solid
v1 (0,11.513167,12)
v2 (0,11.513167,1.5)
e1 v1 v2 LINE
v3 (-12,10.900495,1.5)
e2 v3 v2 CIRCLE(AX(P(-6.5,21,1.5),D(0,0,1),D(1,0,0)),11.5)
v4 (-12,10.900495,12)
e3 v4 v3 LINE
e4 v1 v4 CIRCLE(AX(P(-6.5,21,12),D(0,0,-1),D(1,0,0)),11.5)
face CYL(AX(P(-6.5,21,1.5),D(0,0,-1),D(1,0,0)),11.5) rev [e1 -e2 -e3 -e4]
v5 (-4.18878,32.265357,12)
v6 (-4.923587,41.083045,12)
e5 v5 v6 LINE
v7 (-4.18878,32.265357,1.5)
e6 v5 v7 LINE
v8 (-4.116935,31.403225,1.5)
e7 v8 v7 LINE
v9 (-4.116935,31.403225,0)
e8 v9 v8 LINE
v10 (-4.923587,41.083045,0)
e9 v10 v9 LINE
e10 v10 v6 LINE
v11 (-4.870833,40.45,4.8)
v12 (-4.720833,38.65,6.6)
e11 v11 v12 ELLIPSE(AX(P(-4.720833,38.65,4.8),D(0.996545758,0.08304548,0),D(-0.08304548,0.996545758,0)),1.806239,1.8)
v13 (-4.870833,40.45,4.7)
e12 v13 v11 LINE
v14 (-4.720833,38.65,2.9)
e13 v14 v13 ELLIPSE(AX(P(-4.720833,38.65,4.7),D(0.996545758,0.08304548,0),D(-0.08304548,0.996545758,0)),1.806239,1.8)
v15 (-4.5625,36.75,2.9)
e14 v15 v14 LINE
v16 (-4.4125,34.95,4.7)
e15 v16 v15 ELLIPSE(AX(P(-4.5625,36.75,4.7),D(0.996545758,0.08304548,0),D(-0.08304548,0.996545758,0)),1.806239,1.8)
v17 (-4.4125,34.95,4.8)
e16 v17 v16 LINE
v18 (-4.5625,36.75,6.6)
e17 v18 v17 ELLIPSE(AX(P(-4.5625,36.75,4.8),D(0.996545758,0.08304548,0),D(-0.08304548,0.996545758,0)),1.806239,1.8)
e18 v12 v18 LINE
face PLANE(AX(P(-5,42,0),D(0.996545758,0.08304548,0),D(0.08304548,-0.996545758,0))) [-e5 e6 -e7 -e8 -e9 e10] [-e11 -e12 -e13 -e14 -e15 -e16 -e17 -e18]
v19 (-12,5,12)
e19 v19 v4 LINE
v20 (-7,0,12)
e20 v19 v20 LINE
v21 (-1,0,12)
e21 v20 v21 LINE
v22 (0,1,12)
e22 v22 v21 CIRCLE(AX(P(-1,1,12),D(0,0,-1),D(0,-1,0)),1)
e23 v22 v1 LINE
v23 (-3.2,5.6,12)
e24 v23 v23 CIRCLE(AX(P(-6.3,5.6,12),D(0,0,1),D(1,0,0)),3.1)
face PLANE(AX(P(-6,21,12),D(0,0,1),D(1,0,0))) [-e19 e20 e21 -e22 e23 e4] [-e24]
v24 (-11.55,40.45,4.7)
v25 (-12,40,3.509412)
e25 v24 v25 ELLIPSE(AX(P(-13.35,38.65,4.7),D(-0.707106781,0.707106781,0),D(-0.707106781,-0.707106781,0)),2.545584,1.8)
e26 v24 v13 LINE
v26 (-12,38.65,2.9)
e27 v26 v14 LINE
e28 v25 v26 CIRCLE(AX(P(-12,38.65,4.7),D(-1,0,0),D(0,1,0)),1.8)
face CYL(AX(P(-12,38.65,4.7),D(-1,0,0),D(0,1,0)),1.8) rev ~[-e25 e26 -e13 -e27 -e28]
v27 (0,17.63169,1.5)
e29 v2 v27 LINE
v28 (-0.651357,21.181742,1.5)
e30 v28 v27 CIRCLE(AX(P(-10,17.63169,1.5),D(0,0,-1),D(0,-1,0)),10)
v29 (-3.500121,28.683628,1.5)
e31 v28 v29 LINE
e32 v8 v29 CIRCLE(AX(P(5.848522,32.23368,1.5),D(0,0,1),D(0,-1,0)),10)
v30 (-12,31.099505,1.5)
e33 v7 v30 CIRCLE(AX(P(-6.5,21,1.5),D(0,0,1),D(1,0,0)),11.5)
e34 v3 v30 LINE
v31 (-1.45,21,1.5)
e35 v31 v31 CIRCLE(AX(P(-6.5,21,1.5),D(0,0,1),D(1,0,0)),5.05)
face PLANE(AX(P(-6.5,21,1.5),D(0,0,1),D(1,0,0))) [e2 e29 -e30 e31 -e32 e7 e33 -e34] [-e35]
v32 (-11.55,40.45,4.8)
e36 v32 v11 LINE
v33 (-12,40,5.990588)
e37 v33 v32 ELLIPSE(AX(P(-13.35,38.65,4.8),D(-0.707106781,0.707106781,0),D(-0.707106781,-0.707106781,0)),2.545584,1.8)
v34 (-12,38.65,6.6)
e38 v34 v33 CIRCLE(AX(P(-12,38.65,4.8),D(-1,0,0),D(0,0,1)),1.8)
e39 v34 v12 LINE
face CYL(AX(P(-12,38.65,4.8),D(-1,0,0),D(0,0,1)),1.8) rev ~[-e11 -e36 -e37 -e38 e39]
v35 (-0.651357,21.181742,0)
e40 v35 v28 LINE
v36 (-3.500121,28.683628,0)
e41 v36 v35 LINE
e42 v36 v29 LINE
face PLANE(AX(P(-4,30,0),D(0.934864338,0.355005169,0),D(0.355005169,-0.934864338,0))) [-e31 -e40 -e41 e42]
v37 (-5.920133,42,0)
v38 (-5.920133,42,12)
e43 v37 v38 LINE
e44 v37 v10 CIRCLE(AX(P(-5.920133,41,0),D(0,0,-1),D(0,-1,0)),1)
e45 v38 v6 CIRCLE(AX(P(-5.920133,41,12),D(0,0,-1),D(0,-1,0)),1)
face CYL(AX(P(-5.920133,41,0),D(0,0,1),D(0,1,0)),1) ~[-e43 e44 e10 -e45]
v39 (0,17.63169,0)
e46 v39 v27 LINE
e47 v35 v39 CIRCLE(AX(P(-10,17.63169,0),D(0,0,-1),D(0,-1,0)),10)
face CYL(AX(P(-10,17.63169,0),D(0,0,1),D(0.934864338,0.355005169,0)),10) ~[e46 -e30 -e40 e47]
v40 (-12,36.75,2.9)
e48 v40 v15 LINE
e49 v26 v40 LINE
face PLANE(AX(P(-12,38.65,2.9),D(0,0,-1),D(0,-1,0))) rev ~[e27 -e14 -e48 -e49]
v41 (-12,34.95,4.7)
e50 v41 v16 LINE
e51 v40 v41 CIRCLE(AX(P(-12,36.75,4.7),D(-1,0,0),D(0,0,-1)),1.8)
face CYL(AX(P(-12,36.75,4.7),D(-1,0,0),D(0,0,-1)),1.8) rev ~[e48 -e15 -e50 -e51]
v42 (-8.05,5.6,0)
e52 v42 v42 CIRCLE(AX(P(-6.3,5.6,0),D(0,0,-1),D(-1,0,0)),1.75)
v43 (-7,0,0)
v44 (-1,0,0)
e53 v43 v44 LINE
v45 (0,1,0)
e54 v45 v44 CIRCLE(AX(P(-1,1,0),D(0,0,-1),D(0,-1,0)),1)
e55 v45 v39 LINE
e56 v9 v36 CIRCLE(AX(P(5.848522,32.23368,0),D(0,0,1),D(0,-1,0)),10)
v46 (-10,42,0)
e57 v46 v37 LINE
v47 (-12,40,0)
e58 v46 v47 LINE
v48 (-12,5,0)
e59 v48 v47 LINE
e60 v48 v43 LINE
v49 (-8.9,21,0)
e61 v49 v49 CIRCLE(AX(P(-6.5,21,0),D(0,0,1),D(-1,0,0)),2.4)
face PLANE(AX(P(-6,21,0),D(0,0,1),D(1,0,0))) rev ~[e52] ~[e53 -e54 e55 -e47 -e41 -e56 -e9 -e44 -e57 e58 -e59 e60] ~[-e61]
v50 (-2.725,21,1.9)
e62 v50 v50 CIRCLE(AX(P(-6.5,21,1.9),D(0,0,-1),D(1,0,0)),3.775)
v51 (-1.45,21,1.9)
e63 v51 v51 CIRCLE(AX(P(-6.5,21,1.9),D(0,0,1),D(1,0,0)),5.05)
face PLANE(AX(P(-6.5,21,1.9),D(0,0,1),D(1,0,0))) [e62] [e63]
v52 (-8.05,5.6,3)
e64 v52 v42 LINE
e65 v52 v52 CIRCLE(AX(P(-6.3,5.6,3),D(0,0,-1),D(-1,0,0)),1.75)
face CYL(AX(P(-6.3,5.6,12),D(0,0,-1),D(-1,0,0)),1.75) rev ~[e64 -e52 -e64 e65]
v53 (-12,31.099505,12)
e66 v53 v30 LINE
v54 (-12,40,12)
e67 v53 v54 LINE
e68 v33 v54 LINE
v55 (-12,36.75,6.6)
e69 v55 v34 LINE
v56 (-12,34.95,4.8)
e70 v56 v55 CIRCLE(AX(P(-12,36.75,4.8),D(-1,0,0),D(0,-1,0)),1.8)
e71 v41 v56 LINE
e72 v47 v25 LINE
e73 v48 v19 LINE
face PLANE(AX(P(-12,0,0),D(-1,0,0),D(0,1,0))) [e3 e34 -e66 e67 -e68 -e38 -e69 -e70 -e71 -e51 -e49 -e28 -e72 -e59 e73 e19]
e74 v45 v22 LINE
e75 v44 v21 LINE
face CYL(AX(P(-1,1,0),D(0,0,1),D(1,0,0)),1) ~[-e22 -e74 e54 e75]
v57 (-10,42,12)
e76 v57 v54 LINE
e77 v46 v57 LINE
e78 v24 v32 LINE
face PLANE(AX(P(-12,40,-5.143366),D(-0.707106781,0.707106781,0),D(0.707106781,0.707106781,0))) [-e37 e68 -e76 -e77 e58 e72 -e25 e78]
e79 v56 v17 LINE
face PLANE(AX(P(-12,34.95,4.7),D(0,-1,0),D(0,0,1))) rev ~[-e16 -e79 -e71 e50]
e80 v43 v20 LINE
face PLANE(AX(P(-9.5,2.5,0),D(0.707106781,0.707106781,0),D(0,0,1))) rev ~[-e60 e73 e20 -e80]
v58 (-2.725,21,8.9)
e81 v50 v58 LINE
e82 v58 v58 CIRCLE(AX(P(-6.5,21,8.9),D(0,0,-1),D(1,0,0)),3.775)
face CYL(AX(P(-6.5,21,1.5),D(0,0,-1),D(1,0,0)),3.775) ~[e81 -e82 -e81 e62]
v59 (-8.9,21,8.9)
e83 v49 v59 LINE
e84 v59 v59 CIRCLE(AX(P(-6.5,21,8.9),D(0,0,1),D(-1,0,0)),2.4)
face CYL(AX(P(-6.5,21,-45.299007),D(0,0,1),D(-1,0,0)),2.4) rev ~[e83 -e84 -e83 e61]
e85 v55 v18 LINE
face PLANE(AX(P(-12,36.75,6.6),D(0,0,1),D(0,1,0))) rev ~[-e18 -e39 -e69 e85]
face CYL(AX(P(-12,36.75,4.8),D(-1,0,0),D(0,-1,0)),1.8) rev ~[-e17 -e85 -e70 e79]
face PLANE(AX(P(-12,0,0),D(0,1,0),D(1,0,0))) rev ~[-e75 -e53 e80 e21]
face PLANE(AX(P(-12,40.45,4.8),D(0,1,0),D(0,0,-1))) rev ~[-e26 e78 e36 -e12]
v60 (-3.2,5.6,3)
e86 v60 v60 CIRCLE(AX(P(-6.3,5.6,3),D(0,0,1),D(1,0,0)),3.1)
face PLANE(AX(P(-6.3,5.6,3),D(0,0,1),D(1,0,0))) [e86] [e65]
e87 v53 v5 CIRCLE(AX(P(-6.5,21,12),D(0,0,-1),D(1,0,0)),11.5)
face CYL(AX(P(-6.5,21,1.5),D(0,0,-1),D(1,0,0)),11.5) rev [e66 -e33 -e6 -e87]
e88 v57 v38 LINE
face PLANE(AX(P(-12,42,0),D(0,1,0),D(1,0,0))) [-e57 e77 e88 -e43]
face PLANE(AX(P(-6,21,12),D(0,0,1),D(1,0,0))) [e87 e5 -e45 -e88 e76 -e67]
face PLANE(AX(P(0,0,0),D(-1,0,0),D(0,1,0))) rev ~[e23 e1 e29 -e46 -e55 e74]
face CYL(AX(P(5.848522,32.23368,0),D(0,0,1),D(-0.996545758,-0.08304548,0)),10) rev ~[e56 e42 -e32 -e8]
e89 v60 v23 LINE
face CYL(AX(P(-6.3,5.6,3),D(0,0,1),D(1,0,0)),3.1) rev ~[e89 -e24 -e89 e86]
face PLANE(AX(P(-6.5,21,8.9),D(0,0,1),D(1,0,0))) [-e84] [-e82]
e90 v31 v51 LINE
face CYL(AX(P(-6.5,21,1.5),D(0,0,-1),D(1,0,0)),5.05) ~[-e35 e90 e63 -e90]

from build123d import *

# Parameters (mm, degrees)
F1_W            = 12
F1_H            = 42
F2_DEPTH        = 12
F7_R            = 11.5
F7_R_2          = 3.775
F9_DEPTH        = 25
F8_R            = 5.05
F10_DEPTH       = 0.4
F11_D           = 4.8
F12_D           = 3.5
F12_CBORE_D     = 6.2
F12_CBORE_DEPTH = 9
F14_DEPTH       = 25
F16_DEPTH       = 25
F17_SIZE        = 5
F18_T1_DEPTH    = 22.2867319519
F19_R           = 1
F20_R           = 4.5
F21_DEPTH       = 3.1
F22_R           = 10


# Not quite as in the source:
# - a fillet or chamfer that OpenCascade refuses, or shapes differently, is made with other operations: its cross-section is extruded or revolved along the edge and cut away or added


with BuildPart() as f2:
    # F1 (on Top) → F2 (new body)
    with BuildSketch(Plane.XY):
        with Locations((-6, 21)):
            Rectangle(F1_W, F1_H)
    extrude(amount=F2_DEPTH)

    # F7 (on offset) → F9 (cut)
    with BuildSketch(Plane.XY.offset(1.5)):
        with Locations((-6.5, 21)):
            Circle(F7_R)
        with Locations((-6.5, 21)):
            Circle(F7_R_2, mode=Mode.SUBTRACT)
    extrude(amount=F9_DEPTH, mode=Mode.SUBTRACT)

    # F8 (on offset) → F10 (join)
    with BuildSketch(Plane.XY.offset(1.5)):
        with Locations((-6.5, 21)):
            Circle(F8_R)
    extrude(amount=F10_DEPTH)

    # F11 (through all)
    with Locations(Plane(origin=(0, 0, 0), x_dir=(1, 0, 0), z_dir=(0, 0, -1))):
        with Locations((-6.5, -21)):
            Hole(F11_D / 2)

    # F12 (through all)
    with Locations(Plane.XY.offset(12)):
        with Locations((-6.3, 5.6)):
            CounterBoreHole(F12_D / 2, F12_CBORE_D / 2, F12_CBORE_DEPTH)

    # F13 (on Top) → F14 (cut)
    with BuildSketch(Plane.XY):
        Polygon((-5, 42), (-4, 30), (0, 19.4664706794), (0, 42), align=None)
    extrude(amount=F14_DEPTH, mode=Mode.SUBTRACT)

    # F15 (on offset) → F16 (cut)
    with BuildSketch(Plane(origin=(-12, 0, 0), x_dir=(0, -1, 0), z_dir=(-1, 0, 0))):
        with BuildLine():
            Line((-36.75, 6.6), (-38.65, 6.6))
            ThreePointArc((-38.65, 6.6), (-39.9227922061, 6.0727922061), (-40.45, 4.8))
            Line((-40.45, 4.8), (-40.45, 4.7))
            ThreePointArc((-40.45, 4.7), (-39.9227922061, 3.4272077939), (-38.65, 2.9))
            Line((-38.65, 2.9), (-36.75, 2.9))
            ThreePointArc((-36.75, 2.9), (-35.4772077939, 3.4272077939), (-34.95, 4.7))
            Line((-34.95, 4.7), (-34.95, 4.8))
            ThreePointArc((-34.95, 4.8), (-35.4772077939, 6.0727922061), (-36.75, 6.6))
        make_face()
    extrude(amount=-F16_DEPTH, mode=Mode.SUBTRACT)

    # F17
    f17_edges = [f2.edges().sort_by_distance(p)[0] for p in [
        (-12, 0, 6),
    ]]
    chamfer(f17_edges, length=F17_SIZE)

    # F18: chamfer of 2 on 1 edges, made by hand

    # F18_s2 → F18_t1 (cut)
    with BuildSketch(Plane.XY.offset(-5.1433659759)):
        Polygon((-12, 40), (-10, 42), (-12, 42), align=None)
    extrude(amount=F18_T1_DEPTH, mode=Mode.SUBTRACT)

    # F19
    f19_edges = [f2.edges().sort_by_distance(p)[0] for p in [
        (0, 0, 6),
        (-5, 42, 6),
    ]]
    fillet(f19_edges, radius=F19_R)

    # F20 (on offset) → F21 (cut)
    with BuildSketch(Plane.XY.offset(12)):
        with Locations((-6.5, 21)):
            Circle(F20_R)
    extrude(amount=-F21_DEPTH, mode=Mode.SUBTRACT)

    # F22
    f22_edges = [f2.edges().sort_by_distance(p)[0] for p in [
        (-4, 30, 0.75),
        (0, 19.466471, 0.75),
    ]]
    fillet(f22_edges, radius=F22_R)


solid = f2.part
